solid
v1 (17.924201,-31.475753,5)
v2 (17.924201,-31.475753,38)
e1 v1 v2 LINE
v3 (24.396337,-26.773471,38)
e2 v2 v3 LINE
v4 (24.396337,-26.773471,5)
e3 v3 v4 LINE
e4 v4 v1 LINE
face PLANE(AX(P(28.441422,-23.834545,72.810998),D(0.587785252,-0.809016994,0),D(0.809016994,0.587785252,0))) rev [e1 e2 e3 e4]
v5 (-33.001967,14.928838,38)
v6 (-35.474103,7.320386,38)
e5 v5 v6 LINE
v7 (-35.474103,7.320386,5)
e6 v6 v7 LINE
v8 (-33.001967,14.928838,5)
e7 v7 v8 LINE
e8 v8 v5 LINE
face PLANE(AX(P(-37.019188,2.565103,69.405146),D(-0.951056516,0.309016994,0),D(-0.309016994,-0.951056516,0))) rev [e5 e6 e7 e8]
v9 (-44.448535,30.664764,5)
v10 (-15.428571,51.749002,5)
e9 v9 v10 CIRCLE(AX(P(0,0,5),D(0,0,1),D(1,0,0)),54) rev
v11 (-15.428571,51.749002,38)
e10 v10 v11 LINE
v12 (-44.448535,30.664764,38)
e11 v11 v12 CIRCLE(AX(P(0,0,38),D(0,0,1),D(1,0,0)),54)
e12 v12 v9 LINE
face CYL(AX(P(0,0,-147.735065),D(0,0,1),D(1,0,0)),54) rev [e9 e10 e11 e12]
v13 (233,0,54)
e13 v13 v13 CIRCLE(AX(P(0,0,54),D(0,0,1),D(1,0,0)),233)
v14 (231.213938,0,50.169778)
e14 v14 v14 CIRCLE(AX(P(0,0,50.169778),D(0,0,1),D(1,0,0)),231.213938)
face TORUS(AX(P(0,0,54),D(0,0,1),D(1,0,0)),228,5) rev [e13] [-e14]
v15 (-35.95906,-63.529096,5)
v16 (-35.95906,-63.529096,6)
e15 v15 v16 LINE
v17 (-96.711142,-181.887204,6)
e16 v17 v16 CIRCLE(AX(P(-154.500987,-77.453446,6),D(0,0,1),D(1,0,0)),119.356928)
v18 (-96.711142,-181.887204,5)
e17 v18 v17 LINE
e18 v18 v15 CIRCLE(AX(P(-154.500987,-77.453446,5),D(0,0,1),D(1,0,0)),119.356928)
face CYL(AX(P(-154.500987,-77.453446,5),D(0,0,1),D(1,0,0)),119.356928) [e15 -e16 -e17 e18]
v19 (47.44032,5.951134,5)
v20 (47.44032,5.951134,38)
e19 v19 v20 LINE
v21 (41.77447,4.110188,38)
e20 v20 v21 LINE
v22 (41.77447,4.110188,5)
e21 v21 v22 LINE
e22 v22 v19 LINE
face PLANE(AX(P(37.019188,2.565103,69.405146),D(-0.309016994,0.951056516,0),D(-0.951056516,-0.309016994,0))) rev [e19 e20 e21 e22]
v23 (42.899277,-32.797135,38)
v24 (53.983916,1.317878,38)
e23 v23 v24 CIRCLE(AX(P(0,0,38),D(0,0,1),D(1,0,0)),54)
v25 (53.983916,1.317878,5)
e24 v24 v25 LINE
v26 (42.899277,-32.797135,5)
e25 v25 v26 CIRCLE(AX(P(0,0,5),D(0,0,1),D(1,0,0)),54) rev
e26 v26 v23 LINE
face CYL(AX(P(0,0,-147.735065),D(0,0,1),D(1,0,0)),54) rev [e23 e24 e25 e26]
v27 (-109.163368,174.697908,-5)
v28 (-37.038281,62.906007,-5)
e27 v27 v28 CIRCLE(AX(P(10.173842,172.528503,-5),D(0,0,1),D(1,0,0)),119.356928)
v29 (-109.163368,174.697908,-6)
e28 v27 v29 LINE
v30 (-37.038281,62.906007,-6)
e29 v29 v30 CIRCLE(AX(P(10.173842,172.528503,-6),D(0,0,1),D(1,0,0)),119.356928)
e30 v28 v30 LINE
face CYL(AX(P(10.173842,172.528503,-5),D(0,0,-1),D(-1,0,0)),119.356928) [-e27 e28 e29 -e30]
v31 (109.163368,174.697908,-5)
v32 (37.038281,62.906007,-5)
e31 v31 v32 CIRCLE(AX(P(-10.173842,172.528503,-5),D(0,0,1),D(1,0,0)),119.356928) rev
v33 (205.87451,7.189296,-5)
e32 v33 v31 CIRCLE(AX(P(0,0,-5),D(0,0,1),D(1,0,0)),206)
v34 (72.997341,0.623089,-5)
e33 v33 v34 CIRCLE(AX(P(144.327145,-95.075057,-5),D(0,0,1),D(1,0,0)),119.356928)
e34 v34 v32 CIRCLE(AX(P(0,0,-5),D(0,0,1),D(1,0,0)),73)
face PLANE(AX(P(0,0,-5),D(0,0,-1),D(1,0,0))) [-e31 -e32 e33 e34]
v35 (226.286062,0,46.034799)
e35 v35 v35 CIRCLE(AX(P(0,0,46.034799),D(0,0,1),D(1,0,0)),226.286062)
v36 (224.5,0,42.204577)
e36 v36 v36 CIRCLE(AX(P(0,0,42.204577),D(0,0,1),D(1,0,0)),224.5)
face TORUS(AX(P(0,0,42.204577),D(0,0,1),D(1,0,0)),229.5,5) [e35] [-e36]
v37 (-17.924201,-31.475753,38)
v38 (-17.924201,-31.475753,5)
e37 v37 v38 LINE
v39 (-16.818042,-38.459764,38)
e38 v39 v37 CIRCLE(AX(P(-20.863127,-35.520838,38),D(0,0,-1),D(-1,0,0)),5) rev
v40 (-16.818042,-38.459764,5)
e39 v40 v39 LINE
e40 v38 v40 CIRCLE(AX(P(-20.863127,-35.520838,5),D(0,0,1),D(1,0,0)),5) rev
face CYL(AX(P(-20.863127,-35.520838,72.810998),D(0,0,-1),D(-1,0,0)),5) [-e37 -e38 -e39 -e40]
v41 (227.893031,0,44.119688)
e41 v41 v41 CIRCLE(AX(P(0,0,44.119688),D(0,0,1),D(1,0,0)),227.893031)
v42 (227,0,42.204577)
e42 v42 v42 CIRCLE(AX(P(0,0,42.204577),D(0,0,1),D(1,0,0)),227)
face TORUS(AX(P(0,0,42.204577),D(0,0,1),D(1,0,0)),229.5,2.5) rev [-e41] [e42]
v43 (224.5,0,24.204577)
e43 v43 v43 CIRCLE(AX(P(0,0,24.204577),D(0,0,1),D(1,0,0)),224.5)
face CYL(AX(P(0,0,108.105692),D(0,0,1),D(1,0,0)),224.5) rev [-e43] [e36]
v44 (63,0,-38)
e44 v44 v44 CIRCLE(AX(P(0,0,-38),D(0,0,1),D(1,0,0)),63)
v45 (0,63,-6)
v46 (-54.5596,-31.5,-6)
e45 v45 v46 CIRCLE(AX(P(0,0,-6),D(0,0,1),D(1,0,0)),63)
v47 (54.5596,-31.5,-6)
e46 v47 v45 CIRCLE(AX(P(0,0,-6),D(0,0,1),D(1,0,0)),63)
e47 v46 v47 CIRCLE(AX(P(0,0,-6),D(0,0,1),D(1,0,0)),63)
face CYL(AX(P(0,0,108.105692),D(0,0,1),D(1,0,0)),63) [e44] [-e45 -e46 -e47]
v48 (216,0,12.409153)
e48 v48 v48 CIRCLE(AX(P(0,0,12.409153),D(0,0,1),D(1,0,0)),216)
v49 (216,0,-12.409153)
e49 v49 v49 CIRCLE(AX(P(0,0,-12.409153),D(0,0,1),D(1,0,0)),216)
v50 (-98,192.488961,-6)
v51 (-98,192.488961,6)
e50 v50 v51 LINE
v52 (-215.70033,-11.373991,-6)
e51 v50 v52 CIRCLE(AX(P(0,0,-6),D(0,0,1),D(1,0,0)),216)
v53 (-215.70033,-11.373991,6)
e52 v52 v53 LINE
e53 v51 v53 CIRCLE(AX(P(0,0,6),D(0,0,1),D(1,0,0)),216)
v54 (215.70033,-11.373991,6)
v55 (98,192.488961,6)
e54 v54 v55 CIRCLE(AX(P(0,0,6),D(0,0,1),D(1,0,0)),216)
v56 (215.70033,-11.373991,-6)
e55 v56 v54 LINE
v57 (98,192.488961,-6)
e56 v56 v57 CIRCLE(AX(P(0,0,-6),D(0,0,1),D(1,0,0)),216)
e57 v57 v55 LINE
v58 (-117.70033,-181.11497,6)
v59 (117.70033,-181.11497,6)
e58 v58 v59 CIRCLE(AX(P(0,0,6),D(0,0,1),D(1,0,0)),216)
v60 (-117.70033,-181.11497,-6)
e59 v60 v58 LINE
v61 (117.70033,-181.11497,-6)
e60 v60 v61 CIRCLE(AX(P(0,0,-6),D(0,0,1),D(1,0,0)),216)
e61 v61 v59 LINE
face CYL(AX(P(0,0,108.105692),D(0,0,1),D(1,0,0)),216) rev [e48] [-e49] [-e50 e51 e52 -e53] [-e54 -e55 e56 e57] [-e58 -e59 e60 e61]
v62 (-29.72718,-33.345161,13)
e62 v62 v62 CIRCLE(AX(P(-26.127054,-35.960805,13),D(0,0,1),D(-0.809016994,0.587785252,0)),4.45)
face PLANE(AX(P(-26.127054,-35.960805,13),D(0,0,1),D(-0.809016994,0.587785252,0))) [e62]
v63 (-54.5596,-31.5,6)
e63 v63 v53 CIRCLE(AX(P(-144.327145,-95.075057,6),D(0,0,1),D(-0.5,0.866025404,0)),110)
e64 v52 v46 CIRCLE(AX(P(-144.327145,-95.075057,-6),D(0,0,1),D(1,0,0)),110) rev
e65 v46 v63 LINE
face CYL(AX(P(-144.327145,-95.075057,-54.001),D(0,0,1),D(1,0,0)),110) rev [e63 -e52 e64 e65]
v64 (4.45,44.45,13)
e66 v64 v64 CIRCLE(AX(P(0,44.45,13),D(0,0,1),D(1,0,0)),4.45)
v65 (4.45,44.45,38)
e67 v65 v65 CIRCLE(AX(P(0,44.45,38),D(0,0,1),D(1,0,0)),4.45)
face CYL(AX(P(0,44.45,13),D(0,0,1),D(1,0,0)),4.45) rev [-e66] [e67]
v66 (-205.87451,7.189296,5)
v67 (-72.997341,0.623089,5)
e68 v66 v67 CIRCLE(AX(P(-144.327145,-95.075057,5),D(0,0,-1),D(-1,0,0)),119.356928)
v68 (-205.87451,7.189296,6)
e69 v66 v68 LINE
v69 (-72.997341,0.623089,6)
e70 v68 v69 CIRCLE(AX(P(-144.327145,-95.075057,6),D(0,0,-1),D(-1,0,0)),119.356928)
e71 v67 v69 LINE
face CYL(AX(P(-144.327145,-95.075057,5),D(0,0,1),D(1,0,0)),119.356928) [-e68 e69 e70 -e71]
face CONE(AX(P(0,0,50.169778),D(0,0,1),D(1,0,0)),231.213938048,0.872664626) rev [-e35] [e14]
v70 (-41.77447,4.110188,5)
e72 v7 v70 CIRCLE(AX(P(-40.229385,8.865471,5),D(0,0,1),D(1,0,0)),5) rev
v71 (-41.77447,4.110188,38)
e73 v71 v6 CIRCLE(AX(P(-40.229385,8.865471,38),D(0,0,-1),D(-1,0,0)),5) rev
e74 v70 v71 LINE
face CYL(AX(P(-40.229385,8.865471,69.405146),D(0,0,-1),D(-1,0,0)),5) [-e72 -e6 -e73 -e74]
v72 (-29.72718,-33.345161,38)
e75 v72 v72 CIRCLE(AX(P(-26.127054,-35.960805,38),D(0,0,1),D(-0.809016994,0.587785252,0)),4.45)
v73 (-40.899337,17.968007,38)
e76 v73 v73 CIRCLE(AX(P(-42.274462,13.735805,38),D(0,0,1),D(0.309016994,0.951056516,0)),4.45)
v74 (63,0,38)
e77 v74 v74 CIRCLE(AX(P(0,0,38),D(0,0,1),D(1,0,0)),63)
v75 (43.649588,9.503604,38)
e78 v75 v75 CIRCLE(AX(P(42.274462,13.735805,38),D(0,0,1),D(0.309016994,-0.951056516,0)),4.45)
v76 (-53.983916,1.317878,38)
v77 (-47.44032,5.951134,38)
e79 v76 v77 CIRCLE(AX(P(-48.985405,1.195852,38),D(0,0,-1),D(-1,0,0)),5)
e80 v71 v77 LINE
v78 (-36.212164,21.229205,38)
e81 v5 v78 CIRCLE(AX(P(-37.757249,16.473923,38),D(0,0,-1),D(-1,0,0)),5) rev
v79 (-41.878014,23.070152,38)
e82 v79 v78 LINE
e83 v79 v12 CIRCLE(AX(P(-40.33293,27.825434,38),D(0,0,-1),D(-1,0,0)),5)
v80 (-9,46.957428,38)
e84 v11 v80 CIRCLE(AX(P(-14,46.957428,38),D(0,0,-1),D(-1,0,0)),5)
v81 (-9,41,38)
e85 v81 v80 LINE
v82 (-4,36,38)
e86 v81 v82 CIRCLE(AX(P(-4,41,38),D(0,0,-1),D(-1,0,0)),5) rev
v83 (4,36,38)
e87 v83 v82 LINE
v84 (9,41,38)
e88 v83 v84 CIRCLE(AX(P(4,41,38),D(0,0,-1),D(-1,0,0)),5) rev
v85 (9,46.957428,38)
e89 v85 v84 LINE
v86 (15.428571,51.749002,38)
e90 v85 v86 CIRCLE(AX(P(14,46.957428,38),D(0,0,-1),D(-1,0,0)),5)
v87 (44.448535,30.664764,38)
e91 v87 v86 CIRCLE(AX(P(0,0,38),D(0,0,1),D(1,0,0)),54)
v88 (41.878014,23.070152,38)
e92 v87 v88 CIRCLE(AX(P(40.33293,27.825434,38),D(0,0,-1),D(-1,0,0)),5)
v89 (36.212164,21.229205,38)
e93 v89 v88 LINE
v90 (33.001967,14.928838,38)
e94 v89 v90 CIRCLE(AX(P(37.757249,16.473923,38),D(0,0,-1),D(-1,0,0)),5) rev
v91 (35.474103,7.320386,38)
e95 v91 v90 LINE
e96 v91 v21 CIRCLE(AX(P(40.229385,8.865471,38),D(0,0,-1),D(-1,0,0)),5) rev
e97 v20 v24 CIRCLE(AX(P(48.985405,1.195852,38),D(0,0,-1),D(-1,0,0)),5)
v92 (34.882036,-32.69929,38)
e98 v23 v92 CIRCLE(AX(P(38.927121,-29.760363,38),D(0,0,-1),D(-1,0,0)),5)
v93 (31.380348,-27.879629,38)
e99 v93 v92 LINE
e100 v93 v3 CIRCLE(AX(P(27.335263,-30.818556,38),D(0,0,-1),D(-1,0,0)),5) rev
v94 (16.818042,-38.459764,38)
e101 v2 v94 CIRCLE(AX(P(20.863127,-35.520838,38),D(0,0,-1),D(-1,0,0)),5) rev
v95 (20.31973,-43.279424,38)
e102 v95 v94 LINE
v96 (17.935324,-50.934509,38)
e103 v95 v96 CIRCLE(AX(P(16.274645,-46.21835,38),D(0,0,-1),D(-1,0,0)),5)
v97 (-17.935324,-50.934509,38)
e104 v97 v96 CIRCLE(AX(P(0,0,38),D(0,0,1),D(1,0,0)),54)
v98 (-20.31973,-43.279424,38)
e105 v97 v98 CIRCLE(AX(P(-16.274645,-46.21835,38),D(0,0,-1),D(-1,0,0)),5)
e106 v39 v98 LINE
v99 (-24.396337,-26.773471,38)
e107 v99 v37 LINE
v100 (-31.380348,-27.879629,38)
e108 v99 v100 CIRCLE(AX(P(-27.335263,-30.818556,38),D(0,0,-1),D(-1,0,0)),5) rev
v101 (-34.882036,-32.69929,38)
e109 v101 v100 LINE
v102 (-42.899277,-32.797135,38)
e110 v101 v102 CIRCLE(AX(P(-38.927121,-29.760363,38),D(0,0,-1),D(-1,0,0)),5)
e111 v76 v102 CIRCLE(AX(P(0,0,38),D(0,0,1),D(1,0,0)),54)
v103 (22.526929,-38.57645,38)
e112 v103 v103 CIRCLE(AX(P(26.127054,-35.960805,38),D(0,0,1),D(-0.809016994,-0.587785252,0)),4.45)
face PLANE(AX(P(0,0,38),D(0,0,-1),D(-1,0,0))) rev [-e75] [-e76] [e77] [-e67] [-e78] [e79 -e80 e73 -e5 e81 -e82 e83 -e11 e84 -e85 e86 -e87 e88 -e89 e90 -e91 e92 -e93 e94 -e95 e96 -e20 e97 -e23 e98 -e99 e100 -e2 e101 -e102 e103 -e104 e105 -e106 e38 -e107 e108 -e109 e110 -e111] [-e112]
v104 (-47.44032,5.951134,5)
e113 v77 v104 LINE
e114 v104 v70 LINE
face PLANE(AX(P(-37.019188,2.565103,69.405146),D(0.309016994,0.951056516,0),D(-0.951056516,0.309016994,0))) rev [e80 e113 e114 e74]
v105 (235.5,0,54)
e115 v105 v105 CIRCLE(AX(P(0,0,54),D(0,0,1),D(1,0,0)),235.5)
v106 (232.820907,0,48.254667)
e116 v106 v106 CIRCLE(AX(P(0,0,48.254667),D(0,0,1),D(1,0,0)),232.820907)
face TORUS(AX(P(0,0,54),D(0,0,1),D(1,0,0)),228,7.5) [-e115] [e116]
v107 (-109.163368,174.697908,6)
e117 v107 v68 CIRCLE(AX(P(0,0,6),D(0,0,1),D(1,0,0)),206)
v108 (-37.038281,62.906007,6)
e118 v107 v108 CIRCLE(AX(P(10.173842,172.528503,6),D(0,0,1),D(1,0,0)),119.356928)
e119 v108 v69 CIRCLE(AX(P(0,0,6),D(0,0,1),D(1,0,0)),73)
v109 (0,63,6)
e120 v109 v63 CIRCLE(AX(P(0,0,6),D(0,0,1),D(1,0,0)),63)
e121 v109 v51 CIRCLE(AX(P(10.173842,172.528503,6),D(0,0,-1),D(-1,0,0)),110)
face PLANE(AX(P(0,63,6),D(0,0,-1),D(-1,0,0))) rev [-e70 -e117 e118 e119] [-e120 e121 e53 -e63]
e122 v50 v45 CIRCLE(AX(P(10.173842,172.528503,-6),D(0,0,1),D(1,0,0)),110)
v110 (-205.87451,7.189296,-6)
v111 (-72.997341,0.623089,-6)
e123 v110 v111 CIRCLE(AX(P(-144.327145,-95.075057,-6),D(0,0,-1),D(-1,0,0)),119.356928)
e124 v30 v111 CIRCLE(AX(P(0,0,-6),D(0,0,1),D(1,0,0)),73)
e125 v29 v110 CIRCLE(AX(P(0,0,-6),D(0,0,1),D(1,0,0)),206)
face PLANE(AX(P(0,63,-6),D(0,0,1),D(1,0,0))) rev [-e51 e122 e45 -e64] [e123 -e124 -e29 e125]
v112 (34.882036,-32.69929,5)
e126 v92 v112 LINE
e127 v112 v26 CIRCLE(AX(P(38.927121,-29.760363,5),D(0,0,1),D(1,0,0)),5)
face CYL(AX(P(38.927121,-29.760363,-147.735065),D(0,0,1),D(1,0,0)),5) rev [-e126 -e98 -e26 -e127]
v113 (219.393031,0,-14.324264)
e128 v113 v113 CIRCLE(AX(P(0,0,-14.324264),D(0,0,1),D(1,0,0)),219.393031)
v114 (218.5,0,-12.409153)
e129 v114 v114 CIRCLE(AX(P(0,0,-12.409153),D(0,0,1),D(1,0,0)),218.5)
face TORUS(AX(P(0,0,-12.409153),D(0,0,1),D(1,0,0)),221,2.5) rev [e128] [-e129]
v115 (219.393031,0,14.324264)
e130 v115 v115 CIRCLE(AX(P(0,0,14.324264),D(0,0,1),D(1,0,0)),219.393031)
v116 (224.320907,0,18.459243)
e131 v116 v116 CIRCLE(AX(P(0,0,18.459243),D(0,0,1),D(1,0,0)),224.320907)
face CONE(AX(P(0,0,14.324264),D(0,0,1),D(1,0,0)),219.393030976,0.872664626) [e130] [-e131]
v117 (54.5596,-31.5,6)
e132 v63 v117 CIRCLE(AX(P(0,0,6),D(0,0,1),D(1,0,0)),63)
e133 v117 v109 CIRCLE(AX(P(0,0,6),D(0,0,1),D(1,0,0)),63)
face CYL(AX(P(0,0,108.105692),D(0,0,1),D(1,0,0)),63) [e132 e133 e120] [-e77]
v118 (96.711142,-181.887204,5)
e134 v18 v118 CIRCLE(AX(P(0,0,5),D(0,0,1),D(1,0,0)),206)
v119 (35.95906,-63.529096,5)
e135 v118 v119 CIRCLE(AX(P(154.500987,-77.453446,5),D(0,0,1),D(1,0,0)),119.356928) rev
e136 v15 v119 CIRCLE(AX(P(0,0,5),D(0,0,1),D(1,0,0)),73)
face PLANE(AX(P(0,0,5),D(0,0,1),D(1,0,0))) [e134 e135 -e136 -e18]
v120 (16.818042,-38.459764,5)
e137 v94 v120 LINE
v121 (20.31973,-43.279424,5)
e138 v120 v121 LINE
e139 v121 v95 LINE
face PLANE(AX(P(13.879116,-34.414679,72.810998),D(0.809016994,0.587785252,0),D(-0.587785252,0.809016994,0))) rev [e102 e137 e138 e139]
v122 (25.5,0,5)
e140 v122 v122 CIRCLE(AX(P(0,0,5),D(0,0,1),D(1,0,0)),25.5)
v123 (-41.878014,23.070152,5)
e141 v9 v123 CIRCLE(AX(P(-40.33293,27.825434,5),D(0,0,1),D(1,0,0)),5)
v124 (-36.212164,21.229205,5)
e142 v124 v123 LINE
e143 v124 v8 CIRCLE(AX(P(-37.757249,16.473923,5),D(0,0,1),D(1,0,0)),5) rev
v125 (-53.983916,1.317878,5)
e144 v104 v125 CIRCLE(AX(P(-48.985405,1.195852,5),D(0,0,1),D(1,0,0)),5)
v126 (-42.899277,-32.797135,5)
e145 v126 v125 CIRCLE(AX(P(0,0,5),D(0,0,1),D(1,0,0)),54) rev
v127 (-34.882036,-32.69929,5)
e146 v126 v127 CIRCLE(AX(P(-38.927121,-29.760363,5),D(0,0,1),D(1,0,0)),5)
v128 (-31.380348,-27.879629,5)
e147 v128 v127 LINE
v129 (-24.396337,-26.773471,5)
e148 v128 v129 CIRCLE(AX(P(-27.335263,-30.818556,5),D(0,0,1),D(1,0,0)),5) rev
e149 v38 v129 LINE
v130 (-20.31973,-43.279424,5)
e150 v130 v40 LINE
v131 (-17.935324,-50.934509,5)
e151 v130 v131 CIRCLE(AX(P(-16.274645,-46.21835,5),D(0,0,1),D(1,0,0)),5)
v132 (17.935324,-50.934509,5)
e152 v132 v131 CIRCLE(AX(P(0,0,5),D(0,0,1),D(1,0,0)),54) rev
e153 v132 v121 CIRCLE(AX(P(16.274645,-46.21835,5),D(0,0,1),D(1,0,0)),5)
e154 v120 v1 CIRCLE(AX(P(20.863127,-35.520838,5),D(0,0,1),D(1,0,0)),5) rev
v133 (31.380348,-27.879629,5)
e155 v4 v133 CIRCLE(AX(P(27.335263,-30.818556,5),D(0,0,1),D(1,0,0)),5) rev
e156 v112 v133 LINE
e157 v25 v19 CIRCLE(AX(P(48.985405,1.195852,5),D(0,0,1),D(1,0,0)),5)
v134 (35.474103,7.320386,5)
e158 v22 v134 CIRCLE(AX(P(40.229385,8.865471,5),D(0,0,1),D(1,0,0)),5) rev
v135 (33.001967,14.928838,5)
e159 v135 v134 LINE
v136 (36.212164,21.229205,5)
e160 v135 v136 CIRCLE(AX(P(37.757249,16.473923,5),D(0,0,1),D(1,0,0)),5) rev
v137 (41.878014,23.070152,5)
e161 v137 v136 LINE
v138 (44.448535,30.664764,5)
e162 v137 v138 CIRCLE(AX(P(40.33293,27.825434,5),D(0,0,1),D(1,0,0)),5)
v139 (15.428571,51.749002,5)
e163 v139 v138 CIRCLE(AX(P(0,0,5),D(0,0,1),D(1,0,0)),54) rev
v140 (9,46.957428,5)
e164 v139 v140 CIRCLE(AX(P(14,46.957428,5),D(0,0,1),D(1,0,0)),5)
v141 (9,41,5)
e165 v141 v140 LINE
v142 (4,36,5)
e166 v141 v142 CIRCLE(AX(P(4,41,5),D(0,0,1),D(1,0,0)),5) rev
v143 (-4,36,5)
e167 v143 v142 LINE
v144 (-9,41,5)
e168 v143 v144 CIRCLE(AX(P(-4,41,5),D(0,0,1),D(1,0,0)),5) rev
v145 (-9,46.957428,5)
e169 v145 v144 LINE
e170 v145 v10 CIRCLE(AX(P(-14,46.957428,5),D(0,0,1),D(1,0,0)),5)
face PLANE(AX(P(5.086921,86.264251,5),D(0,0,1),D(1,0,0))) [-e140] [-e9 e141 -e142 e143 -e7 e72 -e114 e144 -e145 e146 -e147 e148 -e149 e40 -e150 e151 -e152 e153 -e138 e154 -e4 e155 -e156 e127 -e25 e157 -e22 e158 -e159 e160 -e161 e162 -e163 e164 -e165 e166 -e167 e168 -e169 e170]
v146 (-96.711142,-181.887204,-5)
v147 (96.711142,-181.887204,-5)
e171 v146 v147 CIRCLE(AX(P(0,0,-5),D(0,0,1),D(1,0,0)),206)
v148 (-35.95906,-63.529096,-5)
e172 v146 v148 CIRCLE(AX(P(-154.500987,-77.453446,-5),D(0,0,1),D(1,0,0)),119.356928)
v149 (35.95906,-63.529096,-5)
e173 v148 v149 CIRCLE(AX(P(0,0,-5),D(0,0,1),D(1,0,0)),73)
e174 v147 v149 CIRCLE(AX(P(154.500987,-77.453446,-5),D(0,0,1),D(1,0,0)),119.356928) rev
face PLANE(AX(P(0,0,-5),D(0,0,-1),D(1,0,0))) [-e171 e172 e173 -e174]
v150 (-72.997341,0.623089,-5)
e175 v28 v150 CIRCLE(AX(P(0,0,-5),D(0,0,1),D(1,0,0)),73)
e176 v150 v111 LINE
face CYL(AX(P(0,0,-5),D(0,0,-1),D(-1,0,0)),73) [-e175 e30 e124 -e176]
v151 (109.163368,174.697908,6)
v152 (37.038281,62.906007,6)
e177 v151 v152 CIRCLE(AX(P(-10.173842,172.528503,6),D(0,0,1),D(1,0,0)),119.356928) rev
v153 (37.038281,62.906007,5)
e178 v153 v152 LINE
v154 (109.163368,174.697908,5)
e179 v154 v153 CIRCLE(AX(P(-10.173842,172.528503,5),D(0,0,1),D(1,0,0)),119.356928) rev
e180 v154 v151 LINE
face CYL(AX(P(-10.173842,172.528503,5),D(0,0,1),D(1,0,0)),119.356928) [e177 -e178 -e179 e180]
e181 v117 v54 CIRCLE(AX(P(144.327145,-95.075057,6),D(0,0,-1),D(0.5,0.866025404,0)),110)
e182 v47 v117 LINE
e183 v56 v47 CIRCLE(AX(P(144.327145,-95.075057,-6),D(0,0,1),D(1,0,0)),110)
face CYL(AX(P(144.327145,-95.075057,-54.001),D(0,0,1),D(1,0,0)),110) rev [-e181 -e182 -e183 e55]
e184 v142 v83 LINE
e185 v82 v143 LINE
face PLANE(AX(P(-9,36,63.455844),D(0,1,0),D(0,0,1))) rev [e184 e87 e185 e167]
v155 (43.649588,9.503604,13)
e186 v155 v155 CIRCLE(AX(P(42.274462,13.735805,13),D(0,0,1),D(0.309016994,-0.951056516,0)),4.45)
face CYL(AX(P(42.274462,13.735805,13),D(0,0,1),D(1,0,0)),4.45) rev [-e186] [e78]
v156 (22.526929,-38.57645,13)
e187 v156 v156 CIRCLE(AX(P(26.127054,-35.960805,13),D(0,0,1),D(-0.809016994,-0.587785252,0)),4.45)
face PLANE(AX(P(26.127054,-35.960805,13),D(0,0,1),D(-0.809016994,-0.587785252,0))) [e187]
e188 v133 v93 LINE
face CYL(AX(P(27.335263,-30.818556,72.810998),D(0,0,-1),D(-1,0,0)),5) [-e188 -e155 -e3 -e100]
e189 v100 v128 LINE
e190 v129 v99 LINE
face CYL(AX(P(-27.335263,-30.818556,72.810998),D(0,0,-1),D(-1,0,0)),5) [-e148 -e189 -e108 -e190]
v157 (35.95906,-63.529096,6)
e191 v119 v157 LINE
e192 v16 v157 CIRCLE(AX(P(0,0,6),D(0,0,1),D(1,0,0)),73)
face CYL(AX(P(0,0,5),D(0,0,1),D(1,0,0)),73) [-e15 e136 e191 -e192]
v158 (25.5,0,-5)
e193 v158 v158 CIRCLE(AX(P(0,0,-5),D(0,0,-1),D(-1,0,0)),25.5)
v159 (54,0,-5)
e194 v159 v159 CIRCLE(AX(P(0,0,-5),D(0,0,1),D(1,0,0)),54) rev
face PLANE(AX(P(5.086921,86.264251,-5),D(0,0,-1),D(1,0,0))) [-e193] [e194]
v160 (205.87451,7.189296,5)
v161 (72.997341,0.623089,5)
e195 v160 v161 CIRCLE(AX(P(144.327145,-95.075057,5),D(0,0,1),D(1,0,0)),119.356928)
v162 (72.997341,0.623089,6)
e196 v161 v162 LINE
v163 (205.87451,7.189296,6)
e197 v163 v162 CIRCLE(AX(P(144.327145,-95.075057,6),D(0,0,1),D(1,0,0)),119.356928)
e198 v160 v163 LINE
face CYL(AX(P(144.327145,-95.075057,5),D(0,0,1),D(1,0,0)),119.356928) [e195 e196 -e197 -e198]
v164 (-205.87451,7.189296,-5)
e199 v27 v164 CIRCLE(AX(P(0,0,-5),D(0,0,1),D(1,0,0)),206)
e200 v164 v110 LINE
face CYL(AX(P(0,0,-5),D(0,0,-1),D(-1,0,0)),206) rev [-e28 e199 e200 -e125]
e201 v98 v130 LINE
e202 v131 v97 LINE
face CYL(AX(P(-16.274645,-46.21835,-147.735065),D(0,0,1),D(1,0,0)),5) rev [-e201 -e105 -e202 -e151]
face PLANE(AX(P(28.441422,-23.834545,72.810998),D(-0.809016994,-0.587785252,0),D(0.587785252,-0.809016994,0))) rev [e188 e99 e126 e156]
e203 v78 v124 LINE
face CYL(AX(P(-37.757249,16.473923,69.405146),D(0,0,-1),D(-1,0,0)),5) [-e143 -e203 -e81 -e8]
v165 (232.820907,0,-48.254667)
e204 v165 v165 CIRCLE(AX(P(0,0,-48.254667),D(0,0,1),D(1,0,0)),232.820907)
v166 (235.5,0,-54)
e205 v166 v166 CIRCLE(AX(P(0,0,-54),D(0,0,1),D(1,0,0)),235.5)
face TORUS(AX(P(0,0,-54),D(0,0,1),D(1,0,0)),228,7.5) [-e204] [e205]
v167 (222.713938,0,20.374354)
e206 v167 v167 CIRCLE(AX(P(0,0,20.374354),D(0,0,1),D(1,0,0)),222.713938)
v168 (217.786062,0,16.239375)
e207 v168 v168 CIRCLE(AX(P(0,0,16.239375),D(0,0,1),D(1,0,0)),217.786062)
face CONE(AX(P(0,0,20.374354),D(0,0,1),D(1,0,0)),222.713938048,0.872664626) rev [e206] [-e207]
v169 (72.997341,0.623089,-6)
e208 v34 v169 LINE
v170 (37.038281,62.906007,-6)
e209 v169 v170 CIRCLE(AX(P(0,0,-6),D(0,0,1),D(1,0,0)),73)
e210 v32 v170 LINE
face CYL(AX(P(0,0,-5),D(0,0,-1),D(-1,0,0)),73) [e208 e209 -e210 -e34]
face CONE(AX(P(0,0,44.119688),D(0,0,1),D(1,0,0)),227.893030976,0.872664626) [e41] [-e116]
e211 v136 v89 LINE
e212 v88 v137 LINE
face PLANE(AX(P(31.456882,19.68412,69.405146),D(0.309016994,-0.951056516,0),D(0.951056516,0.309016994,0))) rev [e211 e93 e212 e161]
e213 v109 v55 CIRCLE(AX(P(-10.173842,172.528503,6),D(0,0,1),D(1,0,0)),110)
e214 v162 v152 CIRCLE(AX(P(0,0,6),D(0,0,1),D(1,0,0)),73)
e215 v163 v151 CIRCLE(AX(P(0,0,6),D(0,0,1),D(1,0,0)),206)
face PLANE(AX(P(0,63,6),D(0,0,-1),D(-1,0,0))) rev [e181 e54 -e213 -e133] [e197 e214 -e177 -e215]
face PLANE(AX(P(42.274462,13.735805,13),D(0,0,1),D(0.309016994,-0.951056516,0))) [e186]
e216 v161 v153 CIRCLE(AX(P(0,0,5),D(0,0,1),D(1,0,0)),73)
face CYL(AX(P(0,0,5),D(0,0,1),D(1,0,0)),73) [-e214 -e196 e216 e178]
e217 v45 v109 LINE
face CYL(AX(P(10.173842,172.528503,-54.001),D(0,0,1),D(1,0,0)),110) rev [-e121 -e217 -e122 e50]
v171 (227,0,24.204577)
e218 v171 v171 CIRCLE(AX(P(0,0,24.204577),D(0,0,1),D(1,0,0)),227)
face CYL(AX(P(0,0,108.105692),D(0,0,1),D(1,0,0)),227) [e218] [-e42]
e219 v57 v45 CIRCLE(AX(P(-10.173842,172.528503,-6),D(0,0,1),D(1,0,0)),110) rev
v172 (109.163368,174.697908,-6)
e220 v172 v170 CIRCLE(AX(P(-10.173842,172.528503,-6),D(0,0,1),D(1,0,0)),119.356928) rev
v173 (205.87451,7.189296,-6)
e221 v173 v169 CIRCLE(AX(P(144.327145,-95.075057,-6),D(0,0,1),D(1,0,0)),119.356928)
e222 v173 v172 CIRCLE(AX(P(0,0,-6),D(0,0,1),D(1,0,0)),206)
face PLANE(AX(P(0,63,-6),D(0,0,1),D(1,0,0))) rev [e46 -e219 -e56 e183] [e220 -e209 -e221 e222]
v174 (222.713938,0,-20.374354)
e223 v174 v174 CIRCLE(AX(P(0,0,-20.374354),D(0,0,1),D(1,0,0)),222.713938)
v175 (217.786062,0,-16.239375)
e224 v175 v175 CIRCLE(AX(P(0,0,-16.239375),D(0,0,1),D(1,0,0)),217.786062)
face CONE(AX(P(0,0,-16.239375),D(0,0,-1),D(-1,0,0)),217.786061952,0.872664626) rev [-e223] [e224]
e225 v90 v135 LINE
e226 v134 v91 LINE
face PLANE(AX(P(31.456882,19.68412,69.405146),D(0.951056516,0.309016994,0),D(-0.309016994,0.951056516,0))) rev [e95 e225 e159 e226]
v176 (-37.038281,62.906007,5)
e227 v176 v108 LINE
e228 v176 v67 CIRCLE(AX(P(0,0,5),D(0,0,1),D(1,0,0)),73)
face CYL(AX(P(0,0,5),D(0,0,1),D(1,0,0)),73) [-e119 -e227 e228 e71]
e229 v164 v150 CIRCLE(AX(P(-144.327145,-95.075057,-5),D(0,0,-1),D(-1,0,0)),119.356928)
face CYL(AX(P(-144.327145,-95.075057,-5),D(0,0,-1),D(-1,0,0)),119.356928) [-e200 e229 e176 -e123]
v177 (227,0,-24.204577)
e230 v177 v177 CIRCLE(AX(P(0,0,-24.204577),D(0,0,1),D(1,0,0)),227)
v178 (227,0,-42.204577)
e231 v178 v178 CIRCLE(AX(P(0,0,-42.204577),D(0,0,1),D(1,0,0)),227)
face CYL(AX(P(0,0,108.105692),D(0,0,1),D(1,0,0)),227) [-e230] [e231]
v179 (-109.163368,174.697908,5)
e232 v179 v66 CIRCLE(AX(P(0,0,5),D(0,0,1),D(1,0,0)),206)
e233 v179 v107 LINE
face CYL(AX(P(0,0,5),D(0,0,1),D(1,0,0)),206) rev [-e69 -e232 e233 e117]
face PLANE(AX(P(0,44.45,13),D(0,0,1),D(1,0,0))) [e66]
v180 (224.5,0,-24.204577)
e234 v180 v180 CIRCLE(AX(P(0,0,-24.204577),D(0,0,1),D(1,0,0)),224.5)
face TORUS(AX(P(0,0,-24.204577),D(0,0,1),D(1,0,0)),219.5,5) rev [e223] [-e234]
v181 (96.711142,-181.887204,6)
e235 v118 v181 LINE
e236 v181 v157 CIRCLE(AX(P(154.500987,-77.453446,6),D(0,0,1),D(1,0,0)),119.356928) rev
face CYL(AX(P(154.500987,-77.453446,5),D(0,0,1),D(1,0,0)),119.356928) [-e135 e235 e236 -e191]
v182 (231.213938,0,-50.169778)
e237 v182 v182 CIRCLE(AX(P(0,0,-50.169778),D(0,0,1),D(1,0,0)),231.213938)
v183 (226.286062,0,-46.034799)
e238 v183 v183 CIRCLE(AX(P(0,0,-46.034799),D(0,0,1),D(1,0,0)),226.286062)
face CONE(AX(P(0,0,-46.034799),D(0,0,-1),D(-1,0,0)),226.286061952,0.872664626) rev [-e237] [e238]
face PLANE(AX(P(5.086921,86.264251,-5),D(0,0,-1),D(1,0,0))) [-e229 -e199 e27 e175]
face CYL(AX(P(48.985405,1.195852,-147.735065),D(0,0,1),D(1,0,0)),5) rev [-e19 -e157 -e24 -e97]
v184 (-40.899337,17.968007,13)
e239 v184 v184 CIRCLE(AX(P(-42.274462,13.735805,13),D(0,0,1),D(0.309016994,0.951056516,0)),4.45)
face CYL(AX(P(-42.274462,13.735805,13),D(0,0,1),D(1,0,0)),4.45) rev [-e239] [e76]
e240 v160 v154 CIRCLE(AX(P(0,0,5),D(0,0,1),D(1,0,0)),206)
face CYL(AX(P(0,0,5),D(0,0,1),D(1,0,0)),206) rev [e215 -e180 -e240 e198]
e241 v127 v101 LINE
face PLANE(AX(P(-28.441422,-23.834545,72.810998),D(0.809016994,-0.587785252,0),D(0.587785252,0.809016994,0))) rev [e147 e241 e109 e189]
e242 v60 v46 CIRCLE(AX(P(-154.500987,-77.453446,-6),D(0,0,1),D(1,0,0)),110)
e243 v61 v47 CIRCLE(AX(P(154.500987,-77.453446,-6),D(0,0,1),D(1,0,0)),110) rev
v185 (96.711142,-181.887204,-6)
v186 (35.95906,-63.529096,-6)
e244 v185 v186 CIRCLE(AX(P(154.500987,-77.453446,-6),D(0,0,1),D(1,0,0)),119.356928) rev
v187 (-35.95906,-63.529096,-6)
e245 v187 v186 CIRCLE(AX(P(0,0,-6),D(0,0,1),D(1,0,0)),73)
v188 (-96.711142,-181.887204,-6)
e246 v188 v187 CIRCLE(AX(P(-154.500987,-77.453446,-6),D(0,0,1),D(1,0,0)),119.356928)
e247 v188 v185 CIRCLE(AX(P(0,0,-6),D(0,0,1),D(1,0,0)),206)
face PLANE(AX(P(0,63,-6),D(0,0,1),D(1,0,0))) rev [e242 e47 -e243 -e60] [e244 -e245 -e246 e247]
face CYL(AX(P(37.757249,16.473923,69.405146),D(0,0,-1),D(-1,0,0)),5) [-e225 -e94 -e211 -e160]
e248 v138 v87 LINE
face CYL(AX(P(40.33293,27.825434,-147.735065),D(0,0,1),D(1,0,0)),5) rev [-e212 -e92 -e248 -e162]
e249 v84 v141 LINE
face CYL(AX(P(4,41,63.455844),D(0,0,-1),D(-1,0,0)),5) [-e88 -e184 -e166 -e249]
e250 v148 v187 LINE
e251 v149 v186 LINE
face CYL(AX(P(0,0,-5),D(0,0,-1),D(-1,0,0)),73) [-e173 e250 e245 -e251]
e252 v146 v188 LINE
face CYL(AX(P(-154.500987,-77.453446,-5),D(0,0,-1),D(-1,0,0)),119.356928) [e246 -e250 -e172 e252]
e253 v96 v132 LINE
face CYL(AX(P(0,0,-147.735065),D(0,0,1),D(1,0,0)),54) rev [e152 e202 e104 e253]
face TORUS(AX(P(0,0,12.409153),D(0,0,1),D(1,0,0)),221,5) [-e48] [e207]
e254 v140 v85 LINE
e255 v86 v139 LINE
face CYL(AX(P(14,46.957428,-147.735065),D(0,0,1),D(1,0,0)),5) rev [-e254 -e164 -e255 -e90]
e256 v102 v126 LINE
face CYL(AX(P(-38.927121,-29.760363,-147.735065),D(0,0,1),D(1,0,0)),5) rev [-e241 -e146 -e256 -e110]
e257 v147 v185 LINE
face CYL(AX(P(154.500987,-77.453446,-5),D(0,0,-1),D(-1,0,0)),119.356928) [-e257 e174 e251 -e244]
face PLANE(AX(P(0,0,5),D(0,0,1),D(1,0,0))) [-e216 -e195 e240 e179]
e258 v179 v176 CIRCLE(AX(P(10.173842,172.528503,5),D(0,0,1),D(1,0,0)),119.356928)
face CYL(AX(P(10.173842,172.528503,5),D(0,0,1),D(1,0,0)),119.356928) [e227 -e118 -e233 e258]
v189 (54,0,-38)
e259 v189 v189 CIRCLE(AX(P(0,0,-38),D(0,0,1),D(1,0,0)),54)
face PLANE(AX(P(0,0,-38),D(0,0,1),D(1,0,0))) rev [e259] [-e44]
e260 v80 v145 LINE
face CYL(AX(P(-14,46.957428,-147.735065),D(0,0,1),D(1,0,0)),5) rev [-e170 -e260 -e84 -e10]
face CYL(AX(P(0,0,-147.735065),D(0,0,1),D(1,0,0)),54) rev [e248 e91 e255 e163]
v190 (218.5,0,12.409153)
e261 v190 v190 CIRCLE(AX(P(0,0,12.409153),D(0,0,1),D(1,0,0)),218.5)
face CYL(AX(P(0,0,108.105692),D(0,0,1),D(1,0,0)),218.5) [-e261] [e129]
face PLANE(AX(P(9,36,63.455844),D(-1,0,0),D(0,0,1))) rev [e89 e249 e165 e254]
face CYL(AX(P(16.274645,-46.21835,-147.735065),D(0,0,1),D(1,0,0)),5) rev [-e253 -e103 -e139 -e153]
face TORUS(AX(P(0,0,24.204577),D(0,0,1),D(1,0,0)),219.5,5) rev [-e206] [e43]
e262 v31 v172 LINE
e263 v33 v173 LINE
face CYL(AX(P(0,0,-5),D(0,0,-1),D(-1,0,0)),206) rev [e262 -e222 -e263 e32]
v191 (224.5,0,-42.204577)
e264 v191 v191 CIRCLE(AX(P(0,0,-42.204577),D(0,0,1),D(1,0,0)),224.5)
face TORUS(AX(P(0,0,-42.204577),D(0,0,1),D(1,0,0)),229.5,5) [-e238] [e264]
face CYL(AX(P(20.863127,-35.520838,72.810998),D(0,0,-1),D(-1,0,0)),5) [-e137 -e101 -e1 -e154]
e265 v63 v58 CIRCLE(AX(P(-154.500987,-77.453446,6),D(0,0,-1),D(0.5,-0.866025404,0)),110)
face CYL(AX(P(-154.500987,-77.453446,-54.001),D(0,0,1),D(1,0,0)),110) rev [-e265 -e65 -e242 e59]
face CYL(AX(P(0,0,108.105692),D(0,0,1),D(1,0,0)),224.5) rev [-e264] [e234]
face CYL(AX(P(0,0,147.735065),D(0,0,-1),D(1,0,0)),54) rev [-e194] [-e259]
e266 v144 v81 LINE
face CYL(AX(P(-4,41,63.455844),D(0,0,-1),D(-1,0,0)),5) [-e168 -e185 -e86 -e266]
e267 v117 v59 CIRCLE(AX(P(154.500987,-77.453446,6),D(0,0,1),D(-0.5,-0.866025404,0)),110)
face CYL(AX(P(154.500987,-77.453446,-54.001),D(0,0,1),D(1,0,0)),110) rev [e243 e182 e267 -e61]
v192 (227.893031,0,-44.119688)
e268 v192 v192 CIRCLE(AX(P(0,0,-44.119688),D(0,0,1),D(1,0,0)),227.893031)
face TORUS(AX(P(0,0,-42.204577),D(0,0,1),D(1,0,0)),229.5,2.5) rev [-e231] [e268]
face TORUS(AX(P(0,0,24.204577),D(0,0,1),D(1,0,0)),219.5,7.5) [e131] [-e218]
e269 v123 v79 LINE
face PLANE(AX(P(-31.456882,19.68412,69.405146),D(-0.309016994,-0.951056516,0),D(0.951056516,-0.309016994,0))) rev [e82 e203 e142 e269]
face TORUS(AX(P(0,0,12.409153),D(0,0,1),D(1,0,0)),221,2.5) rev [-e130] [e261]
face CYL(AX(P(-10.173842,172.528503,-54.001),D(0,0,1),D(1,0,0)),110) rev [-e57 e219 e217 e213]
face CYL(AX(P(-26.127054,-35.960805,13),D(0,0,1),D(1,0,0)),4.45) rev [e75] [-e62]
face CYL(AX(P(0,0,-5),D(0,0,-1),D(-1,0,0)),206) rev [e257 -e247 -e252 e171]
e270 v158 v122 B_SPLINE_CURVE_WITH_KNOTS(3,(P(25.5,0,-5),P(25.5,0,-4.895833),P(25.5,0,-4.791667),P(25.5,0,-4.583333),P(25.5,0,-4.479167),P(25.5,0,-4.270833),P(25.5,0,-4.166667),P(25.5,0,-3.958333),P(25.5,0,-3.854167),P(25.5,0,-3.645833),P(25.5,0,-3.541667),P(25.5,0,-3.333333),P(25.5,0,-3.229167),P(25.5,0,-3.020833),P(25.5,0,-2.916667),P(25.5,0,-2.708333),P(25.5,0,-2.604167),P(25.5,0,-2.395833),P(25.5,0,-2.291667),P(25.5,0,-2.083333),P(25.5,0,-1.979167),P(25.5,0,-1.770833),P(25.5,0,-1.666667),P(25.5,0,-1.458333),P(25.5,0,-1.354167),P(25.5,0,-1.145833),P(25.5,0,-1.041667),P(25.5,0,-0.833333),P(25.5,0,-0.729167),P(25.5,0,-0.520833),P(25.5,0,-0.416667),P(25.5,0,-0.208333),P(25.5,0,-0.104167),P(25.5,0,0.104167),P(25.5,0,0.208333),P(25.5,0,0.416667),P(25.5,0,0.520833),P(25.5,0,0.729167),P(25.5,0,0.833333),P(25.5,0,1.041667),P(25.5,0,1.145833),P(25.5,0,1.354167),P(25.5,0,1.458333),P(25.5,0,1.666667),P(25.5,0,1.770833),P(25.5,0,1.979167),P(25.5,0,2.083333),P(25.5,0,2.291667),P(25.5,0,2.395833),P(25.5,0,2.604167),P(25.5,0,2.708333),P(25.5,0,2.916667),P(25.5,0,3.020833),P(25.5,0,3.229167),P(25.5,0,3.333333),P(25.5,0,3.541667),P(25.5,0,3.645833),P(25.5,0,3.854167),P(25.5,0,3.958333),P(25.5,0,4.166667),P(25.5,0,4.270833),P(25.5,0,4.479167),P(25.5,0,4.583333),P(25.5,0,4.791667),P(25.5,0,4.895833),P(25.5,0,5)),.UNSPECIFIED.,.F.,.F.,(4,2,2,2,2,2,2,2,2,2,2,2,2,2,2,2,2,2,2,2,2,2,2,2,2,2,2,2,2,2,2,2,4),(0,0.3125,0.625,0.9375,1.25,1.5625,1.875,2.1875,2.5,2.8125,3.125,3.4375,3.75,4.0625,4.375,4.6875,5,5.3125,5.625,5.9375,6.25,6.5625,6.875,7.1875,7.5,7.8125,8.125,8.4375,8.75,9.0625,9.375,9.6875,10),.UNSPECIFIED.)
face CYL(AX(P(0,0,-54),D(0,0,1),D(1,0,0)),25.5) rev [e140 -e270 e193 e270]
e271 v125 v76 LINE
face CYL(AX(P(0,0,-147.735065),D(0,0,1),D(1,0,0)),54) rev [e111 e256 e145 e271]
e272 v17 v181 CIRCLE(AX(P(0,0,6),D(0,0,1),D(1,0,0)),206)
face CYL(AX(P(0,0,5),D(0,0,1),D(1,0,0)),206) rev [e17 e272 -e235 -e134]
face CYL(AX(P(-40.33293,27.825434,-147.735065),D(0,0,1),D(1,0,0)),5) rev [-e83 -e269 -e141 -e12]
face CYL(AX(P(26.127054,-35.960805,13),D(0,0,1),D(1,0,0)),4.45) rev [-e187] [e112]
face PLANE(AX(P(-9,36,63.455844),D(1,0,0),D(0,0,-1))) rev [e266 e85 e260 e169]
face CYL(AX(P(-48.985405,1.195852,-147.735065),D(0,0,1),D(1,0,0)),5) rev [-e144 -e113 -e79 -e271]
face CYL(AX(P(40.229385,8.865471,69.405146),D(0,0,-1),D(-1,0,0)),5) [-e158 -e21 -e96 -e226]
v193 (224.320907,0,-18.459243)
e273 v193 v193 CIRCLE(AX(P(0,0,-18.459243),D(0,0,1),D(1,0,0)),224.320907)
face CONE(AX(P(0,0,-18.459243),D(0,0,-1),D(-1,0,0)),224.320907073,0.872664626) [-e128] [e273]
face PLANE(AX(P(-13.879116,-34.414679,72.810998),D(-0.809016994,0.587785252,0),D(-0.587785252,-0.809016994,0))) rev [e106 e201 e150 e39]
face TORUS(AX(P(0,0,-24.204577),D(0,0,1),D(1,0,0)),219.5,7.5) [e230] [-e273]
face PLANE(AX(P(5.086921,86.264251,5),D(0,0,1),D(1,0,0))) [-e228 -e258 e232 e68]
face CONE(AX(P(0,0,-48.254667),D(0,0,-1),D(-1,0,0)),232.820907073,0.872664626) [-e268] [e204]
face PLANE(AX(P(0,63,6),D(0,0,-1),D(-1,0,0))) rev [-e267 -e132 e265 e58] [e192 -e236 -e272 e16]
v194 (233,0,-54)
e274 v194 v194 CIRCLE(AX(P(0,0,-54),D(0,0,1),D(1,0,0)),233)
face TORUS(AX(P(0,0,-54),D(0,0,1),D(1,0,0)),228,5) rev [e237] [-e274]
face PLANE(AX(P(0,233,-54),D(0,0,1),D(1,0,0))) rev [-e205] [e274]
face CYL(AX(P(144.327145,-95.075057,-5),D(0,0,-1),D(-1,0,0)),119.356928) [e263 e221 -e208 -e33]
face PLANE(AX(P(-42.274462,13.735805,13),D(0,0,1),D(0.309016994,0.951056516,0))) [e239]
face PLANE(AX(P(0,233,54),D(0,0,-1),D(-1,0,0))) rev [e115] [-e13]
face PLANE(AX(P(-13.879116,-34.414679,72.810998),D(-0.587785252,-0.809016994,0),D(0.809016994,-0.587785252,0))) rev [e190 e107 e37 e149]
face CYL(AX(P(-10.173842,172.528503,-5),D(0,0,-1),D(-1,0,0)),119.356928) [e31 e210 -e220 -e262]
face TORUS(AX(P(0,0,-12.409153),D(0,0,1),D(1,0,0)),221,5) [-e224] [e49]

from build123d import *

# Parameters (mm, degrees)
CUT_EXTRUDE1_REACH  = 340.409
CIRPATTERN1_COUNT   = 3
CUT_EXTRUDE2_DEPTH  = 1
SKETCH4_R           = 54
CUT_EXTRUDE3_DEPTH  = 33
SKETCH5_R           = 25.5
CUT_EXTRUDE4_DEPTH  = 339.23290792
BOSS_EXTRUDE1_DEPTH = 33
SKETCH7_R           = 4.45
CUT_EXTRUDE5_DEPTH  = 25
CIRPATTERN2_COUNT   = 5
FILLET1_R           = 5


with BuildPart() as part:
    # Sketch1 → Revolve1 (revolve)
    with BuildSketch(Plane(origin=(0, 0, 0), x_dir=(0, 0, -1), z_dir=(1, 0, 0)), mode=Mode.PRIVATE) as revolve1_sk:
        with BuildLine():
            Line((-38, 0), (38, 0))
            Line((38, 0), (38, 63))
            Line((38, 63), (6, 63))
            Line((6, 63), (6, 216))
            Line((6, 216), (12.409153107, 216))
            ThreePointArc((12.409153107, 216), (14.522244416, 216.468461065), (16.239375322, 217.786061952))
            Line((16.239375322, 217.786061952), (20.374354338, 222.713938048))
            ThreePointArc((20.374354338, 222.713938048), (22.091485245, 224.031538935), (24.204576553, 224.5))
            Line((24.204576553, 224.5), (42.204576553, 224.5))
            ThreePointArc((42.204576553, 224.5), (44.317667862, 224.968461065), (46.034798769, 226.286061952))
            Line((46.034798769, 226.286061952), (50.169777784, 231.213938048))
            ThreePointArc((50.169777784, 231.213938048), (51.886908691, 232.531538935), (54, 233))
            Line((54, 233), (54, 235.5))
            ThreePointArc((54, 235.5), (50.830363037, 234.797308403), (48.254666677, 232.820907073))
            Line((48.254666677, 232.820907073), (44.119687661, 227.893030976))
            ThreePointArc((44.119687661, 227.893030976), (43.261122208, 227.234230532), (42.204576553, 227))
            Line((42.204576553, 227), (24.204576553, 227))
            ThreePointArc((24.204576553, 227), (21.03493959, 226.297308403), (18.45924323, 224.320907073))
            Line((18.45924323, 224.320907073), (14.324264215, 219.393030976))
            ThreePointArc((14.324264215, 219.393030976), (13.465698761, 218.734230532), (12.409153107, 218.5))
            Line((12.409153107, 218.5), (0, 218.5))
            Line((0, 218.5), (-12.409153107, 218.5))
            ThreePointArc((-12.409153107, 218.5), (-13.465698761, 218.734230532), (-14.324264215, 219.393030976))
            Line((-14.324264215, 219.393030976), (-18.45924323, 224.320907073))
            ThreePointArc((-18.45924323, 224.320907073), (-21.03493959, 226.297308403), (-24.204576553, 227))
            Line((-24.204576553, 227), (-42.204576553, 227))
            ThreePointArc((-42.204576553, 227), (-43.261122208, 227.234230532), (-44.119687661, 227.893030976))
            Line((-44.119687661, 227.893030976), (-48.254666677, 232.820907073))
            ThreePointArc((-48.254666677, 232.820907073), (-50.830363037, 234.797308403), (-54, 235.5))
            Line((-54, 235.5), (-54, 233))
            ThreePointArc((-54, 233), (-51.886908691, 232.531538935), (-50.169777784, 231.213938048))
            Line((-50.169777784, 231.213938048), (-46.034798769, 226.286061952))
            ThreePointArc((-46.034798769, 226.286061952), (-44.317667862, 224.968461065), (-42.204576553, 224.5))
            Line((-42.204576553, 224.5), (-24.204576553, 224.5))
            ThreePointArc((-24.204576553, 224.5), (-22.091485245, 224.031538935), (-20.374354338, 222.713938048))
            Line((-20.374354338, 222.713938048), (-16.239375322, 217.786061952))
            ThreePointArc((-16.239375322, 217.786061952), (-14.522244416, 216.468461065), (-12.409153107, 216))
            Line((-12.409153107, 216), (-6, 216))
            Line((-6, 216), (-6, 63))
            Line((-6, 63), (-38, 63))
            Line((-38, 63), (-38, 0))
        make_face()
    revolve(revolve1_sk.sketch.rotate(Axis((0, 0, 108.105691878), (0, 0, -1)), 90), axis=Axis((0, 0, 108.105691878), (0, 0, -1)))

    # Sketch2 → Cut-Extrude1 (cut, up to next)
    with BuildSketch(Plane.XY.offset(6), mode=Mode.PRIVATE) as cut_extrude1_sk1:
        with BuildLine():
            ThreePointArc((0, 63), (77.538137266, 106.146211007), (98, 192.488960722))
            ThreePointArc((98, 192.488960722), (0, 216), (-98, 192.488960722))
            ThreePointArc((-98, 192.488960722), (-77.538137266, 106.146211007), (0, 63))
        make_face()
    cut_extrude1_tool1 = extrude(cut_extrude1_sk1.sketch, amount=-CUT_EXTRUDE1_REACH, mode=Mode.PRIVATE) & part.part
    cut_extrude1 = cut_extrude1_tool1.solids().sort_by_distance((0, 145.943107, 6))[0]
    add(cut_extrude1, mode=Mode.SUBTRACT)

    # CirPattern1: Cut-Extrude1 ×3 about axis
    cirpattern1_axis = Axis((0, 0, 0), (0, 0, 1))
    for i in range(1, CIRPATTERN1_COUNT):
        add(cut_extrude1.rotate(cirpattern1_axis, i * 360 / CIRPATTERN1_COUNT), mode=Mode.SUBTRACT)

    # Sketch3 → Cut-Extrude2 (cut)
    with BuildSketch(Plane.XY.offset(6)):
        with BuildLine():
            ThreePointArc((-96.711141934, -181.887204129), (-48.315376308, -131.957501846), (-35.959059696, -63.529095899))
            ThreePointArc((-35.959059696, -63.529095899), (0, -73), (35.959059696, -63.529095899))
            ThreePointArc((35.959059696, -63.529095899), (48.315376308, -131.957501846), (96.711141934, -181.887204129))
            ThreePointArc((96.711141934, -181.887204129), (0, -206), (-96.711141934, -181.887204129))
        make_face()
        with BuildLine():
            ThreePointArc((205.874510366, 7.189296321), (138.436236972, 24.136407646), (72.997340776, 0.623088756))
            ThreePointArc((72.997340776, 0.623088756), (63.219854476, 36.5), (37.03828108, 62.906007143))
            ThreePointArc((37.03828108, 62.906007143), (90.120860664, 107.821094199), (109.163368432, 174.697907808))
            ThreePointArc((109.163368432, 174.697907808), (178.40123318, 103), (205.874510366, 7.189296321))
        make_face()
        with BuildLine():
            ThreePointArc((-37.03828108, 62.906007143), (-63.219854476, 36.5), (-72.997340776, 0.623088756))
            ThreePointArc((-72.997340776, 0.623088756), (-138.436236972, 24.136407646), (-205.874510366, 7.189296321))
            ThreePointArc((-205.874510366, 7.189296321), (-178.40123318, 103), (-109.163368432, 174.697907808))
            ThreePointArc((-109.163368432, 174.697907808), (-90.120860664, 107.821094199), (-37.03828108, 62.906007143))
        make_face()
    cut_extrude2 = extrude(amount=-CUT_EXTRUDE2_DEPTH, mode=Mode.SUBTRACT)

    # Mirror1: Cut-Extrude2 across plane
    add(cut_extrude2.mirror(Plane.XY), mode=Mode.SUBTRACT)

    # Sketch4 → Cut-Extrude3 (cut)
    with BuildSketch(Plane.XY.offset(38)):
        Circle(SKETCH4_R)
    cut_extrude3 = extrude(amount=-CUT_EXTRUDE3_DEPTH, mode=Mode.SUBTRACT)

    # Mirror3: Cut-Extrude3 across plane
    add(cut_extrude3.mirror(Plane.XY), mode=Mode.SUBTRACT)

    # Sketch5 → Cut-Extrude4 (cut, through all)
    with BuildSketch(Plane.XY.offset(5)):
        Circle(SKETCH5_R)
    extrude(amount=-CUT_EXTRUDE4_DEPTH, mode=Mode.SUBTRACT)

    # Sketch6 → Boss-Extrude1 (add)
    with BuildSketch(Plane.XY.offset(5)):
        with BuildLine():
            Line((-9, 36), (9, 36))
            Line((9, 36), (9, 53.244718048))
            ThreePointArc((9, 53.244718048), (0, 54), (-9, 53.244718048))
            Line((-9, 53.244718048), (-9, 36))
        make_face()
    boss_extrude1 = extrude(amount=BOSS_EXTRUDE1_DEPTH)

    # Sketch7 → Cut-Extrude5 (cut)
    with BuildSketch(Plane.XY.offset(38)):
        with Locations((0, 44.45)):
            Circle(SKETCH7_R)
    cut_extrude5 = extrude(amount=-CUT_EXTRUDE5_DEPTH, mode=Mode.SUBTRACT)

    # CirPattern2: Boss-Extrude1, Cut-Extrude5 ×5 about axis
    cirpattern2_axis = Axis((0, 0, 0), (0, 0, 1))
    add([boss_extrude1.rotate(cirpattern2_axis, i * 360 / CIRPATTERN2_COUNT) for i in range(1, CIRPATTERN2_COUNT)])
    add([cut_extrude5.rotate(cirpattern2_axis, i * 360 / CIRPATTERN2_COUNT) for i in range(1, CIRPATTERN2_COUNT)], mode=Mode.SUBTRACT)

    # Fillet1
    # the kernel refuses this fillet: 5 mm, written as the material it adds along each edge
    with BuildSketch(Plane(origin=(-9, 53.244718048, 5), x_dir=(0, -1, 0), z_dir=(0, 0, 1))) as fillet1_piece_1:
        with BuildLine():
            CenterArc((6.28729052, -5), FILLET1_R, 90, 106.601549599)
            Line((1.495716283, -6.428571429), (1.399884798, -6.457142857))
            ThreePointArc((1.399884798, -6.457142857), (0.552149343, -3.259820689), (-0.09860133, -0.016666667))
            Line((-0.09860133, -0.016666667), (0, 0.1))
            Line((0, 0.1), (6.28729052, 0.1))
            Line((6.28729052, 0.1), (6.28729052, 0))
        make_face()
    extrude(amount=33)
    with BuildSketch(Plane(origin=(9, 53.244718048, 5), x_dir=(0, -1, 0), z_dir=(0, 0, 1)), Plane(origin=(-47.857583108, 25.013031384, 5), x_dir=(0.9510565162951538, -0.30901699437494706, 0), z_dir=(0, 0, 1)), Plane(origin=(-38.57761298, -37.785814491, 5), x_dir=(0.5877852522924735, 0.8090169943749471, 0), z_dir=(0, 0, 1)), Plane(origin=(24.015307082, -48.365949032, 5), x_dir=(-0.5877852522924729, 0.8090169943749476, 0), z_dir=(0, 0, 1)), Plane(origin=(53.419889007, 7.894014091, 5), x_dir=(-0.9510565162951538, -0.309016994374947, 0), z_dir=(0, 0, 1))) as fillet1_piece_2:
        with BuildLine():
            CenterArc((6.28729052, 5), FILLET1_R, 163.398450401, 106.601549599)
            Line((1.495716283, 6.428571429), (1.399884798, 6.457142857))
            ThreePointArc((1.399884798, 6.457142857), (0.552149343, 3.259820689), (-0.09860133, 0.016666667))
            Line((-0.09860133, 0.016666667), (0, -0.1))
            Line((0, -0.1), (6.28729052, -0.1))
            Line((6.28729052, -0.1), (6.28729052, 0))
        make_face()
    extrude(amount=33)
    with BuildSketch(Plane(origin=(-53.419889007, 7.894014091, 5), x_dir=(-0.08545502499626349, -0.9963420289754357, 0), z_dir=(0, 0, 1)), Plane(origin=(-24.015307082, -48.365949032, 5), x_dir=(0.9211705241372417, -0.38915917753628704, 0), z_dir=(0, 0, 1)), Plane(origin=(38.57761298, -37.785814491, 5), x_dir=(0.6547697183476342, 0.7558284302240554, 0), z_dir=(0, 0, 1)), Plane(origin=(47.857583108, 25.013031384, 5), x_dir=(-0.5165005833942078, 0.8562868370782323, 0), z_dir=(0, 0, 1))) as fillet1_piece_3:
        with BuildLine():
            CenterArc((6.294711607, 4.990654053), FILLET1_R, 166.902191087, 106.601549599)
            Line((1.424788436, 6.123724357), (1.327389973, 6.146385763))
            Line((1.327389973, 6.146385763), (-0.097398463, 0.022661406))
            Line((-0.097398463, 0.022661406), (-0.00611137, -0.099813081))
            ThreePointArc((-0.00611137, -0.099813081), (3.300140066, -0.200936228), (6.606391502, -0.099813081))
            Line((6.606391502, -0.099813081), (6.600280131, 0))
        make_face()
    extrude(amount=33)
    # the kernel refuses this fillet: 5 mm, written as the material it takes off along each edge
    with BuildSketch(Plane(origin=(9, 36, 5), x_dir=(-1, 0, 0), z_dir=(0, 0, 1)), Plane(origin=(-9, 36, 5), x_dir=(0, 1, 0), z_dir=(0, 0, 1)), Plane(origin=(-31.456881637, 19.684120444, 5), x_dir=(-0.309016994374948, -0.9510565162951533, 0), z_dir=(0, 0, 1)), Plane(origin=(-37.019187536, 2.565103151, 5), x_dir=(-0.9510565162951536, 0.3090169943749472, 0), z_dir=(0, 0, 1)), Plane(origin=(-28.441422032, -23.834544527, 5), x_dir=(0.8090169943749472, -0.5877852522924734, 0), z_dir=(0, 0, 1)), Plane(origin=(-13.879116133, -34.414679068, 5), x_dir=(-0.5877852522924728, -0.8090169943749476, 0), z_dir=(0, 0, 1)), Plane(origin=(13.879116133, -34.414679068, 5), x_dir=(0.8090169943749472, 0.5877852522924734, 0), z_dir=(0, 0, 1)), Plane(origin=(28.441422032, -23.834544527, 5), x_dir=(0.5877852522924722, -0.809016994374948, 0), z_dir=(0, 0, 1)), Plane(origin=(37.019187536, 2.565103151, 5), x_dir=(-0.3090169943749473, 0.9510565162951536, 0), z_dir=(0, 0, 1)), Plane(origin=(31.456881637, 19.684120444, 5), x_dir=(0.9510565162951538, 0.30901699437494684, 0), z_dir=(0, 0, 1))) as fillet1_2_piece_1:
        with BuildLine():
            CenterArc((FILLET1_R, -FILLET1_R), FILLET1_R, 90, 90)
            Line((0, -FILLET1_R), (-FILLET1_R * 0.02, -FILLET1_R))
            Line((-FILLET1_R * 0.02, -FILLET1_R), (-FILLET1_R * 0.02, FILLET1_R * 0.02))
            Line((-FILLET1_R * 0.02, FILLET1_R * 0.02), (FILLET1_R, FILLET1_R * 0.02))
            Line((FILLET1_R, FILLET1_R * 0.02), (FILLET1_R, 0))
        make_face()
    extrude(amount=33, mode=Mode.SUBTRACT)


solid = part.part
